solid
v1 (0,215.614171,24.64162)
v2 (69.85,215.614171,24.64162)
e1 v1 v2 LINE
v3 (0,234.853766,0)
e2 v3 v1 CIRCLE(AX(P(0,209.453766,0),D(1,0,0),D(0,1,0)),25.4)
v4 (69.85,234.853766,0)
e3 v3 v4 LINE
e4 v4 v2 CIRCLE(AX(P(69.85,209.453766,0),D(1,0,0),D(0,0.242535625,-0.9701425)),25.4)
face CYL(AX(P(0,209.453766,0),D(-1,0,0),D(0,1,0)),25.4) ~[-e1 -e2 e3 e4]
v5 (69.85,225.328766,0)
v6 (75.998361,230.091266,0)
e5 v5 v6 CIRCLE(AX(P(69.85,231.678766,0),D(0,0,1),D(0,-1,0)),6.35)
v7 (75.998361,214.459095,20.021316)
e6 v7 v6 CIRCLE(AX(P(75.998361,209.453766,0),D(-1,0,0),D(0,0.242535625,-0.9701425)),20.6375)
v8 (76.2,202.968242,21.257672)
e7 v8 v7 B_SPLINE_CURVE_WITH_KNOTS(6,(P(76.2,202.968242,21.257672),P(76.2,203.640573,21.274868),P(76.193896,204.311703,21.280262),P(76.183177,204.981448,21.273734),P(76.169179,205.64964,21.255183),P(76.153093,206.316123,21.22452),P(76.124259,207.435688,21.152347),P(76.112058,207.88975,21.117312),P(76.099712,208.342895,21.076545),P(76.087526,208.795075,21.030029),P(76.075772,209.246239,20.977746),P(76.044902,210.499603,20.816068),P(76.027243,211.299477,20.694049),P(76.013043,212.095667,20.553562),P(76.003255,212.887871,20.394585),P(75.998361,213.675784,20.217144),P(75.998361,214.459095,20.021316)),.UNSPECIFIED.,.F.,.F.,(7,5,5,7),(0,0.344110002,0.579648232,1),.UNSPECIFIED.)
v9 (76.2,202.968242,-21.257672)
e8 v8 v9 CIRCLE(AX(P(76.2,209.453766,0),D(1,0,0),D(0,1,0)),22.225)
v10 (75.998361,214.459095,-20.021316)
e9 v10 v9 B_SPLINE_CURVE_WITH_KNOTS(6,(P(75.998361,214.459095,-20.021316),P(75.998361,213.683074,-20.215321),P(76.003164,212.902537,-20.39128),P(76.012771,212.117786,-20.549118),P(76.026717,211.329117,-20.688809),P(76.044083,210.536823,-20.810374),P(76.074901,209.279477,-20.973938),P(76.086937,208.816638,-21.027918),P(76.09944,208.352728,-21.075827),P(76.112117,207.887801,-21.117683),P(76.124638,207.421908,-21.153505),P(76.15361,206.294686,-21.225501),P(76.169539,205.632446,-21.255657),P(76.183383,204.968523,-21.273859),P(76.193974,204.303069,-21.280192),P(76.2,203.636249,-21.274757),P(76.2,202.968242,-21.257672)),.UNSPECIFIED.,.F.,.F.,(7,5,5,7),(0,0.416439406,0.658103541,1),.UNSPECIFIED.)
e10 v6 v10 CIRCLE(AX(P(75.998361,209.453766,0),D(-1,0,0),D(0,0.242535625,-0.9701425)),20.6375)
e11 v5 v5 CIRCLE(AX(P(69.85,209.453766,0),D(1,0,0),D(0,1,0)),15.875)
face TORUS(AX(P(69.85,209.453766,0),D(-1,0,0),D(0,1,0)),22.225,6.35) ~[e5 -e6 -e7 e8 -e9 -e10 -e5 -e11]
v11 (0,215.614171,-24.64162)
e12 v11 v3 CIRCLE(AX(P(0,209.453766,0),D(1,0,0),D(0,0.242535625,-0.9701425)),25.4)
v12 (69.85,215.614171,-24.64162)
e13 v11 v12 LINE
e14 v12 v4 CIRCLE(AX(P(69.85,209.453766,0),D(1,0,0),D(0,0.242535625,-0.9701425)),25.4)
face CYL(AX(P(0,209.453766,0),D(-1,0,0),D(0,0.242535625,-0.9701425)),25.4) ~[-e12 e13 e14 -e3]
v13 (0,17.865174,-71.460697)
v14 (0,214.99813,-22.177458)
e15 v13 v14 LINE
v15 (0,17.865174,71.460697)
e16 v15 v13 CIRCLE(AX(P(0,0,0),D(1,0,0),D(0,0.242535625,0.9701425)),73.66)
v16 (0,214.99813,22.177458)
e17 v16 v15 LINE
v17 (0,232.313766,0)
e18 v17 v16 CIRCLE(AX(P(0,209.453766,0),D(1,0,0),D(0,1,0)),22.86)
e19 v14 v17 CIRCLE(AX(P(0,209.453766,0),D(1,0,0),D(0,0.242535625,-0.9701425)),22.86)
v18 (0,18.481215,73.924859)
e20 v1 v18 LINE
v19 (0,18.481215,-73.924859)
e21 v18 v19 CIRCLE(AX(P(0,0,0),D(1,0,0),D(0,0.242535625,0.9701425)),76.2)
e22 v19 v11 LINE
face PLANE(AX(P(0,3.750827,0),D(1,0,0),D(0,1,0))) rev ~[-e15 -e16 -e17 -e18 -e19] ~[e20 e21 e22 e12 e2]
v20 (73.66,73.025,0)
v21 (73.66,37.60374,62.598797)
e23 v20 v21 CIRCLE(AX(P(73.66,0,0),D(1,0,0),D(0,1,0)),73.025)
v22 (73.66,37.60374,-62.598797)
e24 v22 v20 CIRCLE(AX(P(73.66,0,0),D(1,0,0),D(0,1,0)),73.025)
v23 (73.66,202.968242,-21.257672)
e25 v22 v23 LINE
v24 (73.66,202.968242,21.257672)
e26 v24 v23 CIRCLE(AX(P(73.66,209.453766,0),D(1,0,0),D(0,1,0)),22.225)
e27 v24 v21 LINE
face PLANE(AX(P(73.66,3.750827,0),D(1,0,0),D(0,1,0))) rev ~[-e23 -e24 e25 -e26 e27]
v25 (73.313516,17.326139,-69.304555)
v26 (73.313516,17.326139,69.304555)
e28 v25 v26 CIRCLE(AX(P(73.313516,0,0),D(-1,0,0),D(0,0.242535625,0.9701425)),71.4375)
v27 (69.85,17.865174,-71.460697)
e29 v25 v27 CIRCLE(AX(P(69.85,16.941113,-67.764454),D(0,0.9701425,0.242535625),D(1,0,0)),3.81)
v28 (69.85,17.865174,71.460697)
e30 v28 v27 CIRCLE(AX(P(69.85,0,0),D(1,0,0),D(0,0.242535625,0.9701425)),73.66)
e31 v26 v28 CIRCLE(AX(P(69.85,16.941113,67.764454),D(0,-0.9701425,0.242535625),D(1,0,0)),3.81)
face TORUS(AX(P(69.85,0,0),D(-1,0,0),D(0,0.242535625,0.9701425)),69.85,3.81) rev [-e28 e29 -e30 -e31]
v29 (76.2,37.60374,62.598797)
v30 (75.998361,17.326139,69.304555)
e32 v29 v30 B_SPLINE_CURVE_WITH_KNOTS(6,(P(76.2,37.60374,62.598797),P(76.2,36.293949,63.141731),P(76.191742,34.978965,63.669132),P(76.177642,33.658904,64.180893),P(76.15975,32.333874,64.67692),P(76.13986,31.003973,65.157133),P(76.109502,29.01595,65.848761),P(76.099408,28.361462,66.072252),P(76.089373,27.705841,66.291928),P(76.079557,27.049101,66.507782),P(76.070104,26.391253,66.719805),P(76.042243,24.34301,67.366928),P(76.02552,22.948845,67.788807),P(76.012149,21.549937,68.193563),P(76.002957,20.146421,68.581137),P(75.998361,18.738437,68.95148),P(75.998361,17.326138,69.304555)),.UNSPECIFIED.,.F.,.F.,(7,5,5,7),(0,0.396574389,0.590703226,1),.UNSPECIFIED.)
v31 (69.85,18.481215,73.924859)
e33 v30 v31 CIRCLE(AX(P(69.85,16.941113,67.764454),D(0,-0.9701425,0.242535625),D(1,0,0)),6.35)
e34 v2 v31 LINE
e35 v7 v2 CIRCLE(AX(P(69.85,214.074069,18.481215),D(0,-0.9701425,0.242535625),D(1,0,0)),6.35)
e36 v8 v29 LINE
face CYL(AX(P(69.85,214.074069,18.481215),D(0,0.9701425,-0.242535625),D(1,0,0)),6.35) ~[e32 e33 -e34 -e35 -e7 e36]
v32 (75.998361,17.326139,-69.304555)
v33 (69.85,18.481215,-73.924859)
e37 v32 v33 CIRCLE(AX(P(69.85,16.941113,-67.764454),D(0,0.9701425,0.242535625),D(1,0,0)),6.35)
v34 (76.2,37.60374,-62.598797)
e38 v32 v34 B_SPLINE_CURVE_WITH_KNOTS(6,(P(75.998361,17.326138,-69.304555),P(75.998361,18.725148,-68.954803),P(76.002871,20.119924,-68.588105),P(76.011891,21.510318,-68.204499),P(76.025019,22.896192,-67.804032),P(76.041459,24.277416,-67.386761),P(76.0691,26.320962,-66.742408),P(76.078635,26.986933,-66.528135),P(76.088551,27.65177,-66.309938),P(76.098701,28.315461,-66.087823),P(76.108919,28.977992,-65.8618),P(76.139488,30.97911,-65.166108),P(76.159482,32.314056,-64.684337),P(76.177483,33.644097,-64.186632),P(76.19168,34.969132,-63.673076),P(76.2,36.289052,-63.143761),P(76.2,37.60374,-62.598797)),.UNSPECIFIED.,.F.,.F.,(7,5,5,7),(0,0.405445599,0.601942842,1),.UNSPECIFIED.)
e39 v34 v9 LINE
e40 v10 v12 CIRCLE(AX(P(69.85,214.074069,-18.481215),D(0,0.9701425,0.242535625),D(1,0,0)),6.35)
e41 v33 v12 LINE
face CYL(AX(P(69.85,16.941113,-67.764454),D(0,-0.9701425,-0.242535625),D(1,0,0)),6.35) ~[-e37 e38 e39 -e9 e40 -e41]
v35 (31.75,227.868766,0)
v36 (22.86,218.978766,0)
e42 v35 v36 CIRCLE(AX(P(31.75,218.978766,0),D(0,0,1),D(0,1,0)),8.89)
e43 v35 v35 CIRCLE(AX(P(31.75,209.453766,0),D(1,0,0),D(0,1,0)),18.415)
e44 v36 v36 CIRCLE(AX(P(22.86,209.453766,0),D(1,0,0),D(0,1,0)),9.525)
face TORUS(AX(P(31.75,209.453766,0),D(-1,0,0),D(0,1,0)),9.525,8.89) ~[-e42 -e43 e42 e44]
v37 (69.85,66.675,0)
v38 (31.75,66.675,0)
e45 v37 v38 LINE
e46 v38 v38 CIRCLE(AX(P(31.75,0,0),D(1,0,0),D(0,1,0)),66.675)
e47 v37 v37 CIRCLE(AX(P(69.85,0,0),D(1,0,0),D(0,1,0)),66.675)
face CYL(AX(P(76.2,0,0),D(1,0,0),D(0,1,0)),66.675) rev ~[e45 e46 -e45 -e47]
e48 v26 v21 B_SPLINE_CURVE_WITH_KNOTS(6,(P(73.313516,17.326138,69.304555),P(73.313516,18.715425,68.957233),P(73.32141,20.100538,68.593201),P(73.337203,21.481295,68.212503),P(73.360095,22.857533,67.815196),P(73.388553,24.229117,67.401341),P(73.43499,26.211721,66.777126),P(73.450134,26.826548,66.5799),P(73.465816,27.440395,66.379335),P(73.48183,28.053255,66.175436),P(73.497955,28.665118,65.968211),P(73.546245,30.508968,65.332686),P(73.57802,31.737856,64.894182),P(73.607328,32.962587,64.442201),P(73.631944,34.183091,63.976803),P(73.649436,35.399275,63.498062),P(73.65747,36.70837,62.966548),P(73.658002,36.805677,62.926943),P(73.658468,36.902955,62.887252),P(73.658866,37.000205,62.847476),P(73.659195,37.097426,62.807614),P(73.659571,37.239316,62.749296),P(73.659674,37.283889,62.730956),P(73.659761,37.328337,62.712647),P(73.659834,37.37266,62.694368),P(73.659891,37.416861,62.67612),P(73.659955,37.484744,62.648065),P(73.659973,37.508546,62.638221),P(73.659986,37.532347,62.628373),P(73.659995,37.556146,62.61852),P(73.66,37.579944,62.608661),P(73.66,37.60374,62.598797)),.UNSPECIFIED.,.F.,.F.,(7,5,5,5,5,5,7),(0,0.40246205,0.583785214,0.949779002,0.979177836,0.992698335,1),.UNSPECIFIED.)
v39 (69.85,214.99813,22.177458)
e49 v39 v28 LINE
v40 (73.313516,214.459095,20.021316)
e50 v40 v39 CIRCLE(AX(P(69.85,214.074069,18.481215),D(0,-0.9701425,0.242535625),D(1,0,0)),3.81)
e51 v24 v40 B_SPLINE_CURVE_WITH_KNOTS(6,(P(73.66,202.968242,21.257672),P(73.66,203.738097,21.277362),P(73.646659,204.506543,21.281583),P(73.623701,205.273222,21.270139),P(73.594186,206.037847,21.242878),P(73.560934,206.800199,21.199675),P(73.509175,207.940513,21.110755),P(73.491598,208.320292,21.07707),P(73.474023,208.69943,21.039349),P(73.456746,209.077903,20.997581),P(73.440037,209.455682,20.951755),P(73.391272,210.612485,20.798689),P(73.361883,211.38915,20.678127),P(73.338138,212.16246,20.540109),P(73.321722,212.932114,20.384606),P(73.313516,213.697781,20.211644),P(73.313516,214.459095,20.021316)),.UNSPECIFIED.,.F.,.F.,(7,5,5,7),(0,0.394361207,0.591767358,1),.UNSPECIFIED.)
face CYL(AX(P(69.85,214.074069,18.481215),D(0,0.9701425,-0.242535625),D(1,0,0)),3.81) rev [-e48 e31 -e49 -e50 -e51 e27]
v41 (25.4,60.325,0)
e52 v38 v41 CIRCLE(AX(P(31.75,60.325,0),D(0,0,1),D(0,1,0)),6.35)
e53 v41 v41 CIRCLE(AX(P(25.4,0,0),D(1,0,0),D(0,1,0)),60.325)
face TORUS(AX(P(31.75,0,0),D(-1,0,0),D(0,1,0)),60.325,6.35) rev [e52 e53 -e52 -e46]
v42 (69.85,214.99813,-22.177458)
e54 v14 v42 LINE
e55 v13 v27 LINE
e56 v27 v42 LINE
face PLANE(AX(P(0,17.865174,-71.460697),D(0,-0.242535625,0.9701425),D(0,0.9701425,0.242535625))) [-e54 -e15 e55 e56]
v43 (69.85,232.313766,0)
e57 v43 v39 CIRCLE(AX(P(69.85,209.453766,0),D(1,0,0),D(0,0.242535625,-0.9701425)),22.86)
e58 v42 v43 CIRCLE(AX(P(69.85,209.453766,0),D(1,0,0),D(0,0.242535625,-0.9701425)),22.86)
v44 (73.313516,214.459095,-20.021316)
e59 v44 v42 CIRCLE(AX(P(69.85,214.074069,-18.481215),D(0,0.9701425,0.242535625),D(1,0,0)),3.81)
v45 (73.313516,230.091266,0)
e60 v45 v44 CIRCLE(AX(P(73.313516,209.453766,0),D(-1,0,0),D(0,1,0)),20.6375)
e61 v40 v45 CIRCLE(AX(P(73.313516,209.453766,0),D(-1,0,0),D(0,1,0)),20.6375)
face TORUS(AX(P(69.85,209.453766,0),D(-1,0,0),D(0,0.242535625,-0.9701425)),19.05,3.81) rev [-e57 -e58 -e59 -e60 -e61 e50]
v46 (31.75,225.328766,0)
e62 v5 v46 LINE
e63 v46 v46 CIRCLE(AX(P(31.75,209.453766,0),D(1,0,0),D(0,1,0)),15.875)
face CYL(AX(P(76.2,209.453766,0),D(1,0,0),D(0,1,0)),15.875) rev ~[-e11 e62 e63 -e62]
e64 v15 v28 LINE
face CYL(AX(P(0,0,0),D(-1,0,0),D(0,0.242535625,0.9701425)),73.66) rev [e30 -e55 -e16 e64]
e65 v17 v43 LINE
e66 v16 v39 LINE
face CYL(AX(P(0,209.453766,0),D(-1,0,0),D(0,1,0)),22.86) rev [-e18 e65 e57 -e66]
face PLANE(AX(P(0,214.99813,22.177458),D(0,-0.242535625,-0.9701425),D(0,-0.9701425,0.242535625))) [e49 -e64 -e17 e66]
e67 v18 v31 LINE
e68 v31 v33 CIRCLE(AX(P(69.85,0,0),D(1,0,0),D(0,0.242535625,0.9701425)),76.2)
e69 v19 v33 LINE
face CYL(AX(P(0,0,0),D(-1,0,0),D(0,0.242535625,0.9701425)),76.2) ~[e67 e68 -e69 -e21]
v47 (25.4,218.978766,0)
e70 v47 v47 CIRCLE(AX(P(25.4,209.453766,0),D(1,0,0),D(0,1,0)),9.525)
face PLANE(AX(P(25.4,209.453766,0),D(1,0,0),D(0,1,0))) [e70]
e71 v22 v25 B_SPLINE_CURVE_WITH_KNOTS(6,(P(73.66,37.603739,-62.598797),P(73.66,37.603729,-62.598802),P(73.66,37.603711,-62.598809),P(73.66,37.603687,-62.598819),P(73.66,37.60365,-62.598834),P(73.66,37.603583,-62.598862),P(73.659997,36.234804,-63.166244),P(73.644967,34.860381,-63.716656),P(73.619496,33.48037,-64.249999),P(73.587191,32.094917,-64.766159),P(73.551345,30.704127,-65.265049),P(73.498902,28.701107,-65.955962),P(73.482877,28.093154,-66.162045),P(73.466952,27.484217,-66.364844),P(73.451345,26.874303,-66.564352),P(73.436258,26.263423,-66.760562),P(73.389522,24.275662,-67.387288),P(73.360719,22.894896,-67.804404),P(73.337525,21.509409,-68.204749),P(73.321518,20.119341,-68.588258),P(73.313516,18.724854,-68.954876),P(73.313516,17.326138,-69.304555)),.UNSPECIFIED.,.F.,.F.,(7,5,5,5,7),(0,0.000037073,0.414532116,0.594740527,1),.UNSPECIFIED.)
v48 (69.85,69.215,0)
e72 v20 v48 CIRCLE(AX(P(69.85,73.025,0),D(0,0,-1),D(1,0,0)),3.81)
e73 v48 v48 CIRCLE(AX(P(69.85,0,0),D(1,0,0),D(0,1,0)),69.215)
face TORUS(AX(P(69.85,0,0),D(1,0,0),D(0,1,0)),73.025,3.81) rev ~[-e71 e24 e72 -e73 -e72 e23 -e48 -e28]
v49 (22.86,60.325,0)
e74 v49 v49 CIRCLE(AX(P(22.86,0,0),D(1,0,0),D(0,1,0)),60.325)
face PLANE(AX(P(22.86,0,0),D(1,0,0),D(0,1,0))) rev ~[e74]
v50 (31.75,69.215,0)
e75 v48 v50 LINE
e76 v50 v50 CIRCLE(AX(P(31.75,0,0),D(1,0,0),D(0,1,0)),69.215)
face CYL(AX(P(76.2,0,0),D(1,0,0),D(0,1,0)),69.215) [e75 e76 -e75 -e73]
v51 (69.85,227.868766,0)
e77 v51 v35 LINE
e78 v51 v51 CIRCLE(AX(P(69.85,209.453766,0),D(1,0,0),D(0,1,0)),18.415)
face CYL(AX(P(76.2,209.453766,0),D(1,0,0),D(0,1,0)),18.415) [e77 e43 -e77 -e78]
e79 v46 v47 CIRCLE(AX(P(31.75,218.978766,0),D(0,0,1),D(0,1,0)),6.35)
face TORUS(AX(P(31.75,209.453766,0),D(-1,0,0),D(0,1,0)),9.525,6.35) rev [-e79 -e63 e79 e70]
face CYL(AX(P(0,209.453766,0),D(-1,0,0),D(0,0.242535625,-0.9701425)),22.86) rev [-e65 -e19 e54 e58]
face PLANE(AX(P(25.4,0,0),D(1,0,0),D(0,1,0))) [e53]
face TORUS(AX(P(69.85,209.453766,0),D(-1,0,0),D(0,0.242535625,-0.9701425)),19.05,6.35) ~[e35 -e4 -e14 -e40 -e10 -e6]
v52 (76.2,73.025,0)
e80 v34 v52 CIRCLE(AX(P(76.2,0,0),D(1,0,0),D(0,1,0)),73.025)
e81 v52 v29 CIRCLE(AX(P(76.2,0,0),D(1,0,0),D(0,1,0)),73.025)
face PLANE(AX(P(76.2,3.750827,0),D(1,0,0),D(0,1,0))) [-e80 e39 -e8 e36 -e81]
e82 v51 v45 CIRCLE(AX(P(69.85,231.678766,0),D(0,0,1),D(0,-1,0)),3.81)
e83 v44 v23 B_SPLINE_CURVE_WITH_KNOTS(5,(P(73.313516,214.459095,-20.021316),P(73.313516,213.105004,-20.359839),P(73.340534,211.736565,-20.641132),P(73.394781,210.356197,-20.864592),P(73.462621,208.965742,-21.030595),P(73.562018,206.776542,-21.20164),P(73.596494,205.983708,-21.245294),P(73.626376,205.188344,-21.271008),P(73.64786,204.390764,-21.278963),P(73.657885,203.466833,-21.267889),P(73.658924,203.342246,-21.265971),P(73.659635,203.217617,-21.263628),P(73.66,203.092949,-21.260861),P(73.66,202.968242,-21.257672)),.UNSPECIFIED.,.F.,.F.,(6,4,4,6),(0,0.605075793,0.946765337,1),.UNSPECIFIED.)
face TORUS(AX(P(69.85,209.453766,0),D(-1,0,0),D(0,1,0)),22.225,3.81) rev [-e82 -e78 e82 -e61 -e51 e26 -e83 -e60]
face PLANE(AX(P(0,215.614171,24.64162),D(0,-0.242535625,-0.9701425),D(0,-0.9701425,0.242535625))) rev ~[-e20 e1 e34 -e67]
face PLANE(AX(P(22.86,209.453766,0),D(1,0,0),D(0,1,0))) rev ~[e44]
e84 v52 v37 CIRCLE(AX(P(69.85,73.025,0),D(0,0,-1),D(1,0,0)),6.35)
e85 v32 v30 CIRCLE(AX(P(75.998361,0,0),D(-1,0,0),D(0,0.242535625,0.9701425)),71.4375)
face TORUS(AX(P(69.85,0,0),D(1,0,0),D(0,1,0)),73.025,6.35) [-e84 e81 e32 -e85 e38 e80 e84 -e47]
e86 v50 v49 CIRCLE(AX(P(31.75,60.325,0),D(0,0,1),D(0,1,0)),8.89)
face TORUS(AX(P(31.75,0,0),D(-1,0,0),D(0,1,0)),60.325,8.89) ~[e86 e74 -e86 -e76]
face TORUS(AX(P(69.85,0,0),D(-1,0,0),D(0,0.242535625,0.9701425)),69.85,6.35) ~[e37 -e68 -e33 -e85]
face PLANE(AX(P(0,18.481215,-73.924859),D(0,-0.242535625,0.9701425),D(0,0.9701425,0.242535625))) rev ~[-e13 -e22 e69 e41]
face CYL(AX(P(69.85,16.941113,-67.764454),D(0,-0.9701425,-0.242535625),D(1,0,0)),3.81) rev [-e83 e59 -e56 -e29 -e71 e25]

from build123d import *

# Parameters (mm, degrees)
F1_DEPTH    = 76.2
F2_R        = 66.675
F2_R_2      = 15.875
F3_DEPTH    = 50.8
F4_F1_R     = 6.35
F4_T2_DEPTH = 203.2
F4_T4_DEPTH = 203.2
F4_T7_ANGLE = 208.0724869359
F4_T9_ANGLE = 151.9275130641
F5_T        = -2.54


# Not quite as in the source:
# - a fillet or chamfer that OpenCascade refuses, or shapes differently, is made with other operations: its cross-section is extruded or revolved along the edge and cut away or added


with BuildPart() as f1:
    # F0 (on Right) → F1 (new body)
    with BuildSketch(Plane.YZ):
        with BuildLine():
            ThreePointArc((18.4812146278, -73.9248585111), (60.0612543768, -46.8944103565), (76.2, 0))
            ThreePointArc((76.2, 0), (60.0612543768, 46.8944103565), (18.4812146278, 73.9248585111))
            ThreePointArc((18.4812146278, 73.9248585111), (-76.2, 0), (18.4812146278, -73.9248585111))
        make_face()
        with BuildLine():
            ThreePointArc((18.4812146278, 73.9248585111), (60.0612543768, 46.8944103565), (76.2, 0))
            ThreePointArc((76.2, 0), (60.0612543768, -46.8944103565), (18.4812146278, -73.9248585111))
            Line((18.4812146278, -73.9248585111), (215.6141706573, -24.6416195037))
            ThreePointArc((215.6141706573, -24.6416195037), (184.0537657814, 0), (215.6141706573, 24.6416195037))
            Line((215.6141706573, 24.6416195037), (18.4812146278, 73.9248585111))
        make_face()
        with BuildLine():
            ThreePointArc((234.8537657814, 0), (229.474183907, 15.6314701188), (215.6141706573, 24.6416195037))
            ThreePointArc((215.6141706573, 24.6416195037), (184.0537657814, 0), (215.6141706573, -24.6416195037))
            ThreePointArc((215.6141706573, -24.6416195037), (229.474183907, -15.6314701188), (234.8537657814, 0))
        make_face()
    extrude(amount=F1_DEPTH)

    # F2 (on face) → F3 (cut)
    with BuildSketch(Plane.YZ.offset(76.2)):
        Circle(F2_R)
        with Locations((209.4537657814, 0)):
            Circle(F2_R_2)
    extrude(amount=-F3_DEPTH, mode=Mode.SUBTRACT)

    # F4: fillet of radius 6.35 on 8 edges, made by hand

    # F4_f1
    f4_f1_edges = [f1.edges().sort_by_distance(p)[0] for p in [
        (25.4, -66.675, 0),
        (25.4, 193.5787657814, 0),
    ]]
    fillet(f4_f1_edges, radius=F4_F1_R)

    # F4_s3 → F4_t2 (cut)
    with BuildSketch(Plane(origin=(0, 197.1329560295, -49.2832390074), x_dir=(1, 0, 0), z_dir=(0, -0.9701425001, 0.242535625))):
        with BuildLine():
            ThreePointArc((76.2, 69.85), (74.3401280605, 74.3401280605), (69.85, 76.2))
            Line((69.85, 76.2), (69.85, 76.327))
            Line((69.85, 76.327), (76.327, 76.327))
            Line((76.327, 76.327), (76.327, 69.85))
            Line((76.327, 69.85), (76.2, 69.85))
        make_face()
    extrude(amount=F4_T2_DEPTH, mode=Mode.SUBTRACT)

    # F4_s5 → F4_t4 (cut)
    with BuildSketch(Plane(origin=(0, 0, 0), x_dir=(1, 0, 0), z_dir=(0, 0.9701425001, 0.242535625))):
        with BuildLine():
            ThreePointArc((76.2, 69.85), (74.3401280605, 74.3401280605), (69.85, 76.2))
            Line((69.85, 76.2), (69.85, 76.327))
            Line((69.85, 76.327), (76.327, 76.327))
            Line((76.327, 76.327), (76.327, 69.85))
            Line((76.327, 69.85), (76.2, 69.85))
        make_face()
    extrude(amount=F4_T4_DEPTH, mode=Mode.SUBTRACT)

    # F4_s6 → F4_t7 (revolve, cut)
    with BuildSketch(Plane(origin=(0, 0, 0), x_dir=(1, 0, 0), z_dir=(0, 0.9701425001, -0.242535625))):
        with BuildLine():
            ThreePointArc((76.2, -69.85), (74.3401280605, -74.3401280605), (69.85, -76.2))
            Line((69.85, -76.2), (69.85, -76.327))
            Line((69.85, -76.327), (76.327, -76.327))
            Line((76.327, -76.327), (76.327, -69.85))
            Line((76.327, -69.85), (76.2, -69.85))
        make_face()
    revolve(axis=Axis((76.2, 0, 0), (1, 0, 0)), revolution_arc=F4_T7_ANGLE, mode=Mode.SUBTRACT)

    # F4_s8 → F4_t9 (revolve, cut)
    with BuildSketch(Plane(origin=(0, 197.1329560295, 49.2832390074), x_dir=(1, 0, 0), z_dir=(0, -0.9701425001, -0.242535625))):
        with BuildLine():
            ThreePointArc((76.2, -69.85), (74.3401280605, -74.3401280605), (69.85, -76.2))
            Line((69.85, -76.2), (69.85, -76.327))
            Line((69.85, -76.327), (76.327, -76.327))
            Line((76.327, -76.327), (76.327, -69.85))
            Line((76.327, -69.85), (76.2, -69.85))
        make_face()
    revolve(axis=Axis((76.2, 209.4537657814, 0), (1, 0, 0)), revolution_arc=F4_T9_ANGLE, mode=Mode.SUBTRACT)

    # F4_s10 → F4_t11 (revolve, cut)
    with BuildSketch(Plane.XY):
        with BuildLine():
            ThreePointArc((69.85, 225.3287657814), (74.3401280605, 227.1886377208), (76.2, 231.6787657814))
            Line((76.2, 231.6787657814), (76.327, 231.6787657814))
            Line((76.327, 231.6787657814), (76.327, 225.2017657814))
            Line((76.327, 225.2017657814), (69.85, 225.2017657814))
            Line((69.85, 225.2017657814), (69.85, 225.3287657814))
        make_face()
    revolve(axis=Axis((76.2, 209.4537657814, 0), (1, 0, 0)), mode=Mode.SUBTRACT)

    # F4_s12 → F4_t13 (revolve, cut)
    with BuildSketch(Plane.XY):
        with BuildLine():
            ThreePointArc((76.2, 73.025), (74.3401280605, 68.5348719395), (69.85, 66.675))
            Line((69.85, 66.675), (69.85, 66.548))
            Line((69.85, 66.548), (76.327, 66.548))
            Line((76.327, 66.548), (76.327, 73.025))
            Line((76.327, 73.025), (76.2, 73.025))
        make_face()
    revolve(axis=Axis((76.2, 0, 0), (1, 0, 0)), mode=Mode.SUBTRACT)

    # F5
    f5_openings = [f1.faces().sort_by_distance(p)[0] for p in [
        (0, 57.51924, 0),
    ]]
    offset(amount=F5_T, openings=f5_openings)


solid = f1.part
